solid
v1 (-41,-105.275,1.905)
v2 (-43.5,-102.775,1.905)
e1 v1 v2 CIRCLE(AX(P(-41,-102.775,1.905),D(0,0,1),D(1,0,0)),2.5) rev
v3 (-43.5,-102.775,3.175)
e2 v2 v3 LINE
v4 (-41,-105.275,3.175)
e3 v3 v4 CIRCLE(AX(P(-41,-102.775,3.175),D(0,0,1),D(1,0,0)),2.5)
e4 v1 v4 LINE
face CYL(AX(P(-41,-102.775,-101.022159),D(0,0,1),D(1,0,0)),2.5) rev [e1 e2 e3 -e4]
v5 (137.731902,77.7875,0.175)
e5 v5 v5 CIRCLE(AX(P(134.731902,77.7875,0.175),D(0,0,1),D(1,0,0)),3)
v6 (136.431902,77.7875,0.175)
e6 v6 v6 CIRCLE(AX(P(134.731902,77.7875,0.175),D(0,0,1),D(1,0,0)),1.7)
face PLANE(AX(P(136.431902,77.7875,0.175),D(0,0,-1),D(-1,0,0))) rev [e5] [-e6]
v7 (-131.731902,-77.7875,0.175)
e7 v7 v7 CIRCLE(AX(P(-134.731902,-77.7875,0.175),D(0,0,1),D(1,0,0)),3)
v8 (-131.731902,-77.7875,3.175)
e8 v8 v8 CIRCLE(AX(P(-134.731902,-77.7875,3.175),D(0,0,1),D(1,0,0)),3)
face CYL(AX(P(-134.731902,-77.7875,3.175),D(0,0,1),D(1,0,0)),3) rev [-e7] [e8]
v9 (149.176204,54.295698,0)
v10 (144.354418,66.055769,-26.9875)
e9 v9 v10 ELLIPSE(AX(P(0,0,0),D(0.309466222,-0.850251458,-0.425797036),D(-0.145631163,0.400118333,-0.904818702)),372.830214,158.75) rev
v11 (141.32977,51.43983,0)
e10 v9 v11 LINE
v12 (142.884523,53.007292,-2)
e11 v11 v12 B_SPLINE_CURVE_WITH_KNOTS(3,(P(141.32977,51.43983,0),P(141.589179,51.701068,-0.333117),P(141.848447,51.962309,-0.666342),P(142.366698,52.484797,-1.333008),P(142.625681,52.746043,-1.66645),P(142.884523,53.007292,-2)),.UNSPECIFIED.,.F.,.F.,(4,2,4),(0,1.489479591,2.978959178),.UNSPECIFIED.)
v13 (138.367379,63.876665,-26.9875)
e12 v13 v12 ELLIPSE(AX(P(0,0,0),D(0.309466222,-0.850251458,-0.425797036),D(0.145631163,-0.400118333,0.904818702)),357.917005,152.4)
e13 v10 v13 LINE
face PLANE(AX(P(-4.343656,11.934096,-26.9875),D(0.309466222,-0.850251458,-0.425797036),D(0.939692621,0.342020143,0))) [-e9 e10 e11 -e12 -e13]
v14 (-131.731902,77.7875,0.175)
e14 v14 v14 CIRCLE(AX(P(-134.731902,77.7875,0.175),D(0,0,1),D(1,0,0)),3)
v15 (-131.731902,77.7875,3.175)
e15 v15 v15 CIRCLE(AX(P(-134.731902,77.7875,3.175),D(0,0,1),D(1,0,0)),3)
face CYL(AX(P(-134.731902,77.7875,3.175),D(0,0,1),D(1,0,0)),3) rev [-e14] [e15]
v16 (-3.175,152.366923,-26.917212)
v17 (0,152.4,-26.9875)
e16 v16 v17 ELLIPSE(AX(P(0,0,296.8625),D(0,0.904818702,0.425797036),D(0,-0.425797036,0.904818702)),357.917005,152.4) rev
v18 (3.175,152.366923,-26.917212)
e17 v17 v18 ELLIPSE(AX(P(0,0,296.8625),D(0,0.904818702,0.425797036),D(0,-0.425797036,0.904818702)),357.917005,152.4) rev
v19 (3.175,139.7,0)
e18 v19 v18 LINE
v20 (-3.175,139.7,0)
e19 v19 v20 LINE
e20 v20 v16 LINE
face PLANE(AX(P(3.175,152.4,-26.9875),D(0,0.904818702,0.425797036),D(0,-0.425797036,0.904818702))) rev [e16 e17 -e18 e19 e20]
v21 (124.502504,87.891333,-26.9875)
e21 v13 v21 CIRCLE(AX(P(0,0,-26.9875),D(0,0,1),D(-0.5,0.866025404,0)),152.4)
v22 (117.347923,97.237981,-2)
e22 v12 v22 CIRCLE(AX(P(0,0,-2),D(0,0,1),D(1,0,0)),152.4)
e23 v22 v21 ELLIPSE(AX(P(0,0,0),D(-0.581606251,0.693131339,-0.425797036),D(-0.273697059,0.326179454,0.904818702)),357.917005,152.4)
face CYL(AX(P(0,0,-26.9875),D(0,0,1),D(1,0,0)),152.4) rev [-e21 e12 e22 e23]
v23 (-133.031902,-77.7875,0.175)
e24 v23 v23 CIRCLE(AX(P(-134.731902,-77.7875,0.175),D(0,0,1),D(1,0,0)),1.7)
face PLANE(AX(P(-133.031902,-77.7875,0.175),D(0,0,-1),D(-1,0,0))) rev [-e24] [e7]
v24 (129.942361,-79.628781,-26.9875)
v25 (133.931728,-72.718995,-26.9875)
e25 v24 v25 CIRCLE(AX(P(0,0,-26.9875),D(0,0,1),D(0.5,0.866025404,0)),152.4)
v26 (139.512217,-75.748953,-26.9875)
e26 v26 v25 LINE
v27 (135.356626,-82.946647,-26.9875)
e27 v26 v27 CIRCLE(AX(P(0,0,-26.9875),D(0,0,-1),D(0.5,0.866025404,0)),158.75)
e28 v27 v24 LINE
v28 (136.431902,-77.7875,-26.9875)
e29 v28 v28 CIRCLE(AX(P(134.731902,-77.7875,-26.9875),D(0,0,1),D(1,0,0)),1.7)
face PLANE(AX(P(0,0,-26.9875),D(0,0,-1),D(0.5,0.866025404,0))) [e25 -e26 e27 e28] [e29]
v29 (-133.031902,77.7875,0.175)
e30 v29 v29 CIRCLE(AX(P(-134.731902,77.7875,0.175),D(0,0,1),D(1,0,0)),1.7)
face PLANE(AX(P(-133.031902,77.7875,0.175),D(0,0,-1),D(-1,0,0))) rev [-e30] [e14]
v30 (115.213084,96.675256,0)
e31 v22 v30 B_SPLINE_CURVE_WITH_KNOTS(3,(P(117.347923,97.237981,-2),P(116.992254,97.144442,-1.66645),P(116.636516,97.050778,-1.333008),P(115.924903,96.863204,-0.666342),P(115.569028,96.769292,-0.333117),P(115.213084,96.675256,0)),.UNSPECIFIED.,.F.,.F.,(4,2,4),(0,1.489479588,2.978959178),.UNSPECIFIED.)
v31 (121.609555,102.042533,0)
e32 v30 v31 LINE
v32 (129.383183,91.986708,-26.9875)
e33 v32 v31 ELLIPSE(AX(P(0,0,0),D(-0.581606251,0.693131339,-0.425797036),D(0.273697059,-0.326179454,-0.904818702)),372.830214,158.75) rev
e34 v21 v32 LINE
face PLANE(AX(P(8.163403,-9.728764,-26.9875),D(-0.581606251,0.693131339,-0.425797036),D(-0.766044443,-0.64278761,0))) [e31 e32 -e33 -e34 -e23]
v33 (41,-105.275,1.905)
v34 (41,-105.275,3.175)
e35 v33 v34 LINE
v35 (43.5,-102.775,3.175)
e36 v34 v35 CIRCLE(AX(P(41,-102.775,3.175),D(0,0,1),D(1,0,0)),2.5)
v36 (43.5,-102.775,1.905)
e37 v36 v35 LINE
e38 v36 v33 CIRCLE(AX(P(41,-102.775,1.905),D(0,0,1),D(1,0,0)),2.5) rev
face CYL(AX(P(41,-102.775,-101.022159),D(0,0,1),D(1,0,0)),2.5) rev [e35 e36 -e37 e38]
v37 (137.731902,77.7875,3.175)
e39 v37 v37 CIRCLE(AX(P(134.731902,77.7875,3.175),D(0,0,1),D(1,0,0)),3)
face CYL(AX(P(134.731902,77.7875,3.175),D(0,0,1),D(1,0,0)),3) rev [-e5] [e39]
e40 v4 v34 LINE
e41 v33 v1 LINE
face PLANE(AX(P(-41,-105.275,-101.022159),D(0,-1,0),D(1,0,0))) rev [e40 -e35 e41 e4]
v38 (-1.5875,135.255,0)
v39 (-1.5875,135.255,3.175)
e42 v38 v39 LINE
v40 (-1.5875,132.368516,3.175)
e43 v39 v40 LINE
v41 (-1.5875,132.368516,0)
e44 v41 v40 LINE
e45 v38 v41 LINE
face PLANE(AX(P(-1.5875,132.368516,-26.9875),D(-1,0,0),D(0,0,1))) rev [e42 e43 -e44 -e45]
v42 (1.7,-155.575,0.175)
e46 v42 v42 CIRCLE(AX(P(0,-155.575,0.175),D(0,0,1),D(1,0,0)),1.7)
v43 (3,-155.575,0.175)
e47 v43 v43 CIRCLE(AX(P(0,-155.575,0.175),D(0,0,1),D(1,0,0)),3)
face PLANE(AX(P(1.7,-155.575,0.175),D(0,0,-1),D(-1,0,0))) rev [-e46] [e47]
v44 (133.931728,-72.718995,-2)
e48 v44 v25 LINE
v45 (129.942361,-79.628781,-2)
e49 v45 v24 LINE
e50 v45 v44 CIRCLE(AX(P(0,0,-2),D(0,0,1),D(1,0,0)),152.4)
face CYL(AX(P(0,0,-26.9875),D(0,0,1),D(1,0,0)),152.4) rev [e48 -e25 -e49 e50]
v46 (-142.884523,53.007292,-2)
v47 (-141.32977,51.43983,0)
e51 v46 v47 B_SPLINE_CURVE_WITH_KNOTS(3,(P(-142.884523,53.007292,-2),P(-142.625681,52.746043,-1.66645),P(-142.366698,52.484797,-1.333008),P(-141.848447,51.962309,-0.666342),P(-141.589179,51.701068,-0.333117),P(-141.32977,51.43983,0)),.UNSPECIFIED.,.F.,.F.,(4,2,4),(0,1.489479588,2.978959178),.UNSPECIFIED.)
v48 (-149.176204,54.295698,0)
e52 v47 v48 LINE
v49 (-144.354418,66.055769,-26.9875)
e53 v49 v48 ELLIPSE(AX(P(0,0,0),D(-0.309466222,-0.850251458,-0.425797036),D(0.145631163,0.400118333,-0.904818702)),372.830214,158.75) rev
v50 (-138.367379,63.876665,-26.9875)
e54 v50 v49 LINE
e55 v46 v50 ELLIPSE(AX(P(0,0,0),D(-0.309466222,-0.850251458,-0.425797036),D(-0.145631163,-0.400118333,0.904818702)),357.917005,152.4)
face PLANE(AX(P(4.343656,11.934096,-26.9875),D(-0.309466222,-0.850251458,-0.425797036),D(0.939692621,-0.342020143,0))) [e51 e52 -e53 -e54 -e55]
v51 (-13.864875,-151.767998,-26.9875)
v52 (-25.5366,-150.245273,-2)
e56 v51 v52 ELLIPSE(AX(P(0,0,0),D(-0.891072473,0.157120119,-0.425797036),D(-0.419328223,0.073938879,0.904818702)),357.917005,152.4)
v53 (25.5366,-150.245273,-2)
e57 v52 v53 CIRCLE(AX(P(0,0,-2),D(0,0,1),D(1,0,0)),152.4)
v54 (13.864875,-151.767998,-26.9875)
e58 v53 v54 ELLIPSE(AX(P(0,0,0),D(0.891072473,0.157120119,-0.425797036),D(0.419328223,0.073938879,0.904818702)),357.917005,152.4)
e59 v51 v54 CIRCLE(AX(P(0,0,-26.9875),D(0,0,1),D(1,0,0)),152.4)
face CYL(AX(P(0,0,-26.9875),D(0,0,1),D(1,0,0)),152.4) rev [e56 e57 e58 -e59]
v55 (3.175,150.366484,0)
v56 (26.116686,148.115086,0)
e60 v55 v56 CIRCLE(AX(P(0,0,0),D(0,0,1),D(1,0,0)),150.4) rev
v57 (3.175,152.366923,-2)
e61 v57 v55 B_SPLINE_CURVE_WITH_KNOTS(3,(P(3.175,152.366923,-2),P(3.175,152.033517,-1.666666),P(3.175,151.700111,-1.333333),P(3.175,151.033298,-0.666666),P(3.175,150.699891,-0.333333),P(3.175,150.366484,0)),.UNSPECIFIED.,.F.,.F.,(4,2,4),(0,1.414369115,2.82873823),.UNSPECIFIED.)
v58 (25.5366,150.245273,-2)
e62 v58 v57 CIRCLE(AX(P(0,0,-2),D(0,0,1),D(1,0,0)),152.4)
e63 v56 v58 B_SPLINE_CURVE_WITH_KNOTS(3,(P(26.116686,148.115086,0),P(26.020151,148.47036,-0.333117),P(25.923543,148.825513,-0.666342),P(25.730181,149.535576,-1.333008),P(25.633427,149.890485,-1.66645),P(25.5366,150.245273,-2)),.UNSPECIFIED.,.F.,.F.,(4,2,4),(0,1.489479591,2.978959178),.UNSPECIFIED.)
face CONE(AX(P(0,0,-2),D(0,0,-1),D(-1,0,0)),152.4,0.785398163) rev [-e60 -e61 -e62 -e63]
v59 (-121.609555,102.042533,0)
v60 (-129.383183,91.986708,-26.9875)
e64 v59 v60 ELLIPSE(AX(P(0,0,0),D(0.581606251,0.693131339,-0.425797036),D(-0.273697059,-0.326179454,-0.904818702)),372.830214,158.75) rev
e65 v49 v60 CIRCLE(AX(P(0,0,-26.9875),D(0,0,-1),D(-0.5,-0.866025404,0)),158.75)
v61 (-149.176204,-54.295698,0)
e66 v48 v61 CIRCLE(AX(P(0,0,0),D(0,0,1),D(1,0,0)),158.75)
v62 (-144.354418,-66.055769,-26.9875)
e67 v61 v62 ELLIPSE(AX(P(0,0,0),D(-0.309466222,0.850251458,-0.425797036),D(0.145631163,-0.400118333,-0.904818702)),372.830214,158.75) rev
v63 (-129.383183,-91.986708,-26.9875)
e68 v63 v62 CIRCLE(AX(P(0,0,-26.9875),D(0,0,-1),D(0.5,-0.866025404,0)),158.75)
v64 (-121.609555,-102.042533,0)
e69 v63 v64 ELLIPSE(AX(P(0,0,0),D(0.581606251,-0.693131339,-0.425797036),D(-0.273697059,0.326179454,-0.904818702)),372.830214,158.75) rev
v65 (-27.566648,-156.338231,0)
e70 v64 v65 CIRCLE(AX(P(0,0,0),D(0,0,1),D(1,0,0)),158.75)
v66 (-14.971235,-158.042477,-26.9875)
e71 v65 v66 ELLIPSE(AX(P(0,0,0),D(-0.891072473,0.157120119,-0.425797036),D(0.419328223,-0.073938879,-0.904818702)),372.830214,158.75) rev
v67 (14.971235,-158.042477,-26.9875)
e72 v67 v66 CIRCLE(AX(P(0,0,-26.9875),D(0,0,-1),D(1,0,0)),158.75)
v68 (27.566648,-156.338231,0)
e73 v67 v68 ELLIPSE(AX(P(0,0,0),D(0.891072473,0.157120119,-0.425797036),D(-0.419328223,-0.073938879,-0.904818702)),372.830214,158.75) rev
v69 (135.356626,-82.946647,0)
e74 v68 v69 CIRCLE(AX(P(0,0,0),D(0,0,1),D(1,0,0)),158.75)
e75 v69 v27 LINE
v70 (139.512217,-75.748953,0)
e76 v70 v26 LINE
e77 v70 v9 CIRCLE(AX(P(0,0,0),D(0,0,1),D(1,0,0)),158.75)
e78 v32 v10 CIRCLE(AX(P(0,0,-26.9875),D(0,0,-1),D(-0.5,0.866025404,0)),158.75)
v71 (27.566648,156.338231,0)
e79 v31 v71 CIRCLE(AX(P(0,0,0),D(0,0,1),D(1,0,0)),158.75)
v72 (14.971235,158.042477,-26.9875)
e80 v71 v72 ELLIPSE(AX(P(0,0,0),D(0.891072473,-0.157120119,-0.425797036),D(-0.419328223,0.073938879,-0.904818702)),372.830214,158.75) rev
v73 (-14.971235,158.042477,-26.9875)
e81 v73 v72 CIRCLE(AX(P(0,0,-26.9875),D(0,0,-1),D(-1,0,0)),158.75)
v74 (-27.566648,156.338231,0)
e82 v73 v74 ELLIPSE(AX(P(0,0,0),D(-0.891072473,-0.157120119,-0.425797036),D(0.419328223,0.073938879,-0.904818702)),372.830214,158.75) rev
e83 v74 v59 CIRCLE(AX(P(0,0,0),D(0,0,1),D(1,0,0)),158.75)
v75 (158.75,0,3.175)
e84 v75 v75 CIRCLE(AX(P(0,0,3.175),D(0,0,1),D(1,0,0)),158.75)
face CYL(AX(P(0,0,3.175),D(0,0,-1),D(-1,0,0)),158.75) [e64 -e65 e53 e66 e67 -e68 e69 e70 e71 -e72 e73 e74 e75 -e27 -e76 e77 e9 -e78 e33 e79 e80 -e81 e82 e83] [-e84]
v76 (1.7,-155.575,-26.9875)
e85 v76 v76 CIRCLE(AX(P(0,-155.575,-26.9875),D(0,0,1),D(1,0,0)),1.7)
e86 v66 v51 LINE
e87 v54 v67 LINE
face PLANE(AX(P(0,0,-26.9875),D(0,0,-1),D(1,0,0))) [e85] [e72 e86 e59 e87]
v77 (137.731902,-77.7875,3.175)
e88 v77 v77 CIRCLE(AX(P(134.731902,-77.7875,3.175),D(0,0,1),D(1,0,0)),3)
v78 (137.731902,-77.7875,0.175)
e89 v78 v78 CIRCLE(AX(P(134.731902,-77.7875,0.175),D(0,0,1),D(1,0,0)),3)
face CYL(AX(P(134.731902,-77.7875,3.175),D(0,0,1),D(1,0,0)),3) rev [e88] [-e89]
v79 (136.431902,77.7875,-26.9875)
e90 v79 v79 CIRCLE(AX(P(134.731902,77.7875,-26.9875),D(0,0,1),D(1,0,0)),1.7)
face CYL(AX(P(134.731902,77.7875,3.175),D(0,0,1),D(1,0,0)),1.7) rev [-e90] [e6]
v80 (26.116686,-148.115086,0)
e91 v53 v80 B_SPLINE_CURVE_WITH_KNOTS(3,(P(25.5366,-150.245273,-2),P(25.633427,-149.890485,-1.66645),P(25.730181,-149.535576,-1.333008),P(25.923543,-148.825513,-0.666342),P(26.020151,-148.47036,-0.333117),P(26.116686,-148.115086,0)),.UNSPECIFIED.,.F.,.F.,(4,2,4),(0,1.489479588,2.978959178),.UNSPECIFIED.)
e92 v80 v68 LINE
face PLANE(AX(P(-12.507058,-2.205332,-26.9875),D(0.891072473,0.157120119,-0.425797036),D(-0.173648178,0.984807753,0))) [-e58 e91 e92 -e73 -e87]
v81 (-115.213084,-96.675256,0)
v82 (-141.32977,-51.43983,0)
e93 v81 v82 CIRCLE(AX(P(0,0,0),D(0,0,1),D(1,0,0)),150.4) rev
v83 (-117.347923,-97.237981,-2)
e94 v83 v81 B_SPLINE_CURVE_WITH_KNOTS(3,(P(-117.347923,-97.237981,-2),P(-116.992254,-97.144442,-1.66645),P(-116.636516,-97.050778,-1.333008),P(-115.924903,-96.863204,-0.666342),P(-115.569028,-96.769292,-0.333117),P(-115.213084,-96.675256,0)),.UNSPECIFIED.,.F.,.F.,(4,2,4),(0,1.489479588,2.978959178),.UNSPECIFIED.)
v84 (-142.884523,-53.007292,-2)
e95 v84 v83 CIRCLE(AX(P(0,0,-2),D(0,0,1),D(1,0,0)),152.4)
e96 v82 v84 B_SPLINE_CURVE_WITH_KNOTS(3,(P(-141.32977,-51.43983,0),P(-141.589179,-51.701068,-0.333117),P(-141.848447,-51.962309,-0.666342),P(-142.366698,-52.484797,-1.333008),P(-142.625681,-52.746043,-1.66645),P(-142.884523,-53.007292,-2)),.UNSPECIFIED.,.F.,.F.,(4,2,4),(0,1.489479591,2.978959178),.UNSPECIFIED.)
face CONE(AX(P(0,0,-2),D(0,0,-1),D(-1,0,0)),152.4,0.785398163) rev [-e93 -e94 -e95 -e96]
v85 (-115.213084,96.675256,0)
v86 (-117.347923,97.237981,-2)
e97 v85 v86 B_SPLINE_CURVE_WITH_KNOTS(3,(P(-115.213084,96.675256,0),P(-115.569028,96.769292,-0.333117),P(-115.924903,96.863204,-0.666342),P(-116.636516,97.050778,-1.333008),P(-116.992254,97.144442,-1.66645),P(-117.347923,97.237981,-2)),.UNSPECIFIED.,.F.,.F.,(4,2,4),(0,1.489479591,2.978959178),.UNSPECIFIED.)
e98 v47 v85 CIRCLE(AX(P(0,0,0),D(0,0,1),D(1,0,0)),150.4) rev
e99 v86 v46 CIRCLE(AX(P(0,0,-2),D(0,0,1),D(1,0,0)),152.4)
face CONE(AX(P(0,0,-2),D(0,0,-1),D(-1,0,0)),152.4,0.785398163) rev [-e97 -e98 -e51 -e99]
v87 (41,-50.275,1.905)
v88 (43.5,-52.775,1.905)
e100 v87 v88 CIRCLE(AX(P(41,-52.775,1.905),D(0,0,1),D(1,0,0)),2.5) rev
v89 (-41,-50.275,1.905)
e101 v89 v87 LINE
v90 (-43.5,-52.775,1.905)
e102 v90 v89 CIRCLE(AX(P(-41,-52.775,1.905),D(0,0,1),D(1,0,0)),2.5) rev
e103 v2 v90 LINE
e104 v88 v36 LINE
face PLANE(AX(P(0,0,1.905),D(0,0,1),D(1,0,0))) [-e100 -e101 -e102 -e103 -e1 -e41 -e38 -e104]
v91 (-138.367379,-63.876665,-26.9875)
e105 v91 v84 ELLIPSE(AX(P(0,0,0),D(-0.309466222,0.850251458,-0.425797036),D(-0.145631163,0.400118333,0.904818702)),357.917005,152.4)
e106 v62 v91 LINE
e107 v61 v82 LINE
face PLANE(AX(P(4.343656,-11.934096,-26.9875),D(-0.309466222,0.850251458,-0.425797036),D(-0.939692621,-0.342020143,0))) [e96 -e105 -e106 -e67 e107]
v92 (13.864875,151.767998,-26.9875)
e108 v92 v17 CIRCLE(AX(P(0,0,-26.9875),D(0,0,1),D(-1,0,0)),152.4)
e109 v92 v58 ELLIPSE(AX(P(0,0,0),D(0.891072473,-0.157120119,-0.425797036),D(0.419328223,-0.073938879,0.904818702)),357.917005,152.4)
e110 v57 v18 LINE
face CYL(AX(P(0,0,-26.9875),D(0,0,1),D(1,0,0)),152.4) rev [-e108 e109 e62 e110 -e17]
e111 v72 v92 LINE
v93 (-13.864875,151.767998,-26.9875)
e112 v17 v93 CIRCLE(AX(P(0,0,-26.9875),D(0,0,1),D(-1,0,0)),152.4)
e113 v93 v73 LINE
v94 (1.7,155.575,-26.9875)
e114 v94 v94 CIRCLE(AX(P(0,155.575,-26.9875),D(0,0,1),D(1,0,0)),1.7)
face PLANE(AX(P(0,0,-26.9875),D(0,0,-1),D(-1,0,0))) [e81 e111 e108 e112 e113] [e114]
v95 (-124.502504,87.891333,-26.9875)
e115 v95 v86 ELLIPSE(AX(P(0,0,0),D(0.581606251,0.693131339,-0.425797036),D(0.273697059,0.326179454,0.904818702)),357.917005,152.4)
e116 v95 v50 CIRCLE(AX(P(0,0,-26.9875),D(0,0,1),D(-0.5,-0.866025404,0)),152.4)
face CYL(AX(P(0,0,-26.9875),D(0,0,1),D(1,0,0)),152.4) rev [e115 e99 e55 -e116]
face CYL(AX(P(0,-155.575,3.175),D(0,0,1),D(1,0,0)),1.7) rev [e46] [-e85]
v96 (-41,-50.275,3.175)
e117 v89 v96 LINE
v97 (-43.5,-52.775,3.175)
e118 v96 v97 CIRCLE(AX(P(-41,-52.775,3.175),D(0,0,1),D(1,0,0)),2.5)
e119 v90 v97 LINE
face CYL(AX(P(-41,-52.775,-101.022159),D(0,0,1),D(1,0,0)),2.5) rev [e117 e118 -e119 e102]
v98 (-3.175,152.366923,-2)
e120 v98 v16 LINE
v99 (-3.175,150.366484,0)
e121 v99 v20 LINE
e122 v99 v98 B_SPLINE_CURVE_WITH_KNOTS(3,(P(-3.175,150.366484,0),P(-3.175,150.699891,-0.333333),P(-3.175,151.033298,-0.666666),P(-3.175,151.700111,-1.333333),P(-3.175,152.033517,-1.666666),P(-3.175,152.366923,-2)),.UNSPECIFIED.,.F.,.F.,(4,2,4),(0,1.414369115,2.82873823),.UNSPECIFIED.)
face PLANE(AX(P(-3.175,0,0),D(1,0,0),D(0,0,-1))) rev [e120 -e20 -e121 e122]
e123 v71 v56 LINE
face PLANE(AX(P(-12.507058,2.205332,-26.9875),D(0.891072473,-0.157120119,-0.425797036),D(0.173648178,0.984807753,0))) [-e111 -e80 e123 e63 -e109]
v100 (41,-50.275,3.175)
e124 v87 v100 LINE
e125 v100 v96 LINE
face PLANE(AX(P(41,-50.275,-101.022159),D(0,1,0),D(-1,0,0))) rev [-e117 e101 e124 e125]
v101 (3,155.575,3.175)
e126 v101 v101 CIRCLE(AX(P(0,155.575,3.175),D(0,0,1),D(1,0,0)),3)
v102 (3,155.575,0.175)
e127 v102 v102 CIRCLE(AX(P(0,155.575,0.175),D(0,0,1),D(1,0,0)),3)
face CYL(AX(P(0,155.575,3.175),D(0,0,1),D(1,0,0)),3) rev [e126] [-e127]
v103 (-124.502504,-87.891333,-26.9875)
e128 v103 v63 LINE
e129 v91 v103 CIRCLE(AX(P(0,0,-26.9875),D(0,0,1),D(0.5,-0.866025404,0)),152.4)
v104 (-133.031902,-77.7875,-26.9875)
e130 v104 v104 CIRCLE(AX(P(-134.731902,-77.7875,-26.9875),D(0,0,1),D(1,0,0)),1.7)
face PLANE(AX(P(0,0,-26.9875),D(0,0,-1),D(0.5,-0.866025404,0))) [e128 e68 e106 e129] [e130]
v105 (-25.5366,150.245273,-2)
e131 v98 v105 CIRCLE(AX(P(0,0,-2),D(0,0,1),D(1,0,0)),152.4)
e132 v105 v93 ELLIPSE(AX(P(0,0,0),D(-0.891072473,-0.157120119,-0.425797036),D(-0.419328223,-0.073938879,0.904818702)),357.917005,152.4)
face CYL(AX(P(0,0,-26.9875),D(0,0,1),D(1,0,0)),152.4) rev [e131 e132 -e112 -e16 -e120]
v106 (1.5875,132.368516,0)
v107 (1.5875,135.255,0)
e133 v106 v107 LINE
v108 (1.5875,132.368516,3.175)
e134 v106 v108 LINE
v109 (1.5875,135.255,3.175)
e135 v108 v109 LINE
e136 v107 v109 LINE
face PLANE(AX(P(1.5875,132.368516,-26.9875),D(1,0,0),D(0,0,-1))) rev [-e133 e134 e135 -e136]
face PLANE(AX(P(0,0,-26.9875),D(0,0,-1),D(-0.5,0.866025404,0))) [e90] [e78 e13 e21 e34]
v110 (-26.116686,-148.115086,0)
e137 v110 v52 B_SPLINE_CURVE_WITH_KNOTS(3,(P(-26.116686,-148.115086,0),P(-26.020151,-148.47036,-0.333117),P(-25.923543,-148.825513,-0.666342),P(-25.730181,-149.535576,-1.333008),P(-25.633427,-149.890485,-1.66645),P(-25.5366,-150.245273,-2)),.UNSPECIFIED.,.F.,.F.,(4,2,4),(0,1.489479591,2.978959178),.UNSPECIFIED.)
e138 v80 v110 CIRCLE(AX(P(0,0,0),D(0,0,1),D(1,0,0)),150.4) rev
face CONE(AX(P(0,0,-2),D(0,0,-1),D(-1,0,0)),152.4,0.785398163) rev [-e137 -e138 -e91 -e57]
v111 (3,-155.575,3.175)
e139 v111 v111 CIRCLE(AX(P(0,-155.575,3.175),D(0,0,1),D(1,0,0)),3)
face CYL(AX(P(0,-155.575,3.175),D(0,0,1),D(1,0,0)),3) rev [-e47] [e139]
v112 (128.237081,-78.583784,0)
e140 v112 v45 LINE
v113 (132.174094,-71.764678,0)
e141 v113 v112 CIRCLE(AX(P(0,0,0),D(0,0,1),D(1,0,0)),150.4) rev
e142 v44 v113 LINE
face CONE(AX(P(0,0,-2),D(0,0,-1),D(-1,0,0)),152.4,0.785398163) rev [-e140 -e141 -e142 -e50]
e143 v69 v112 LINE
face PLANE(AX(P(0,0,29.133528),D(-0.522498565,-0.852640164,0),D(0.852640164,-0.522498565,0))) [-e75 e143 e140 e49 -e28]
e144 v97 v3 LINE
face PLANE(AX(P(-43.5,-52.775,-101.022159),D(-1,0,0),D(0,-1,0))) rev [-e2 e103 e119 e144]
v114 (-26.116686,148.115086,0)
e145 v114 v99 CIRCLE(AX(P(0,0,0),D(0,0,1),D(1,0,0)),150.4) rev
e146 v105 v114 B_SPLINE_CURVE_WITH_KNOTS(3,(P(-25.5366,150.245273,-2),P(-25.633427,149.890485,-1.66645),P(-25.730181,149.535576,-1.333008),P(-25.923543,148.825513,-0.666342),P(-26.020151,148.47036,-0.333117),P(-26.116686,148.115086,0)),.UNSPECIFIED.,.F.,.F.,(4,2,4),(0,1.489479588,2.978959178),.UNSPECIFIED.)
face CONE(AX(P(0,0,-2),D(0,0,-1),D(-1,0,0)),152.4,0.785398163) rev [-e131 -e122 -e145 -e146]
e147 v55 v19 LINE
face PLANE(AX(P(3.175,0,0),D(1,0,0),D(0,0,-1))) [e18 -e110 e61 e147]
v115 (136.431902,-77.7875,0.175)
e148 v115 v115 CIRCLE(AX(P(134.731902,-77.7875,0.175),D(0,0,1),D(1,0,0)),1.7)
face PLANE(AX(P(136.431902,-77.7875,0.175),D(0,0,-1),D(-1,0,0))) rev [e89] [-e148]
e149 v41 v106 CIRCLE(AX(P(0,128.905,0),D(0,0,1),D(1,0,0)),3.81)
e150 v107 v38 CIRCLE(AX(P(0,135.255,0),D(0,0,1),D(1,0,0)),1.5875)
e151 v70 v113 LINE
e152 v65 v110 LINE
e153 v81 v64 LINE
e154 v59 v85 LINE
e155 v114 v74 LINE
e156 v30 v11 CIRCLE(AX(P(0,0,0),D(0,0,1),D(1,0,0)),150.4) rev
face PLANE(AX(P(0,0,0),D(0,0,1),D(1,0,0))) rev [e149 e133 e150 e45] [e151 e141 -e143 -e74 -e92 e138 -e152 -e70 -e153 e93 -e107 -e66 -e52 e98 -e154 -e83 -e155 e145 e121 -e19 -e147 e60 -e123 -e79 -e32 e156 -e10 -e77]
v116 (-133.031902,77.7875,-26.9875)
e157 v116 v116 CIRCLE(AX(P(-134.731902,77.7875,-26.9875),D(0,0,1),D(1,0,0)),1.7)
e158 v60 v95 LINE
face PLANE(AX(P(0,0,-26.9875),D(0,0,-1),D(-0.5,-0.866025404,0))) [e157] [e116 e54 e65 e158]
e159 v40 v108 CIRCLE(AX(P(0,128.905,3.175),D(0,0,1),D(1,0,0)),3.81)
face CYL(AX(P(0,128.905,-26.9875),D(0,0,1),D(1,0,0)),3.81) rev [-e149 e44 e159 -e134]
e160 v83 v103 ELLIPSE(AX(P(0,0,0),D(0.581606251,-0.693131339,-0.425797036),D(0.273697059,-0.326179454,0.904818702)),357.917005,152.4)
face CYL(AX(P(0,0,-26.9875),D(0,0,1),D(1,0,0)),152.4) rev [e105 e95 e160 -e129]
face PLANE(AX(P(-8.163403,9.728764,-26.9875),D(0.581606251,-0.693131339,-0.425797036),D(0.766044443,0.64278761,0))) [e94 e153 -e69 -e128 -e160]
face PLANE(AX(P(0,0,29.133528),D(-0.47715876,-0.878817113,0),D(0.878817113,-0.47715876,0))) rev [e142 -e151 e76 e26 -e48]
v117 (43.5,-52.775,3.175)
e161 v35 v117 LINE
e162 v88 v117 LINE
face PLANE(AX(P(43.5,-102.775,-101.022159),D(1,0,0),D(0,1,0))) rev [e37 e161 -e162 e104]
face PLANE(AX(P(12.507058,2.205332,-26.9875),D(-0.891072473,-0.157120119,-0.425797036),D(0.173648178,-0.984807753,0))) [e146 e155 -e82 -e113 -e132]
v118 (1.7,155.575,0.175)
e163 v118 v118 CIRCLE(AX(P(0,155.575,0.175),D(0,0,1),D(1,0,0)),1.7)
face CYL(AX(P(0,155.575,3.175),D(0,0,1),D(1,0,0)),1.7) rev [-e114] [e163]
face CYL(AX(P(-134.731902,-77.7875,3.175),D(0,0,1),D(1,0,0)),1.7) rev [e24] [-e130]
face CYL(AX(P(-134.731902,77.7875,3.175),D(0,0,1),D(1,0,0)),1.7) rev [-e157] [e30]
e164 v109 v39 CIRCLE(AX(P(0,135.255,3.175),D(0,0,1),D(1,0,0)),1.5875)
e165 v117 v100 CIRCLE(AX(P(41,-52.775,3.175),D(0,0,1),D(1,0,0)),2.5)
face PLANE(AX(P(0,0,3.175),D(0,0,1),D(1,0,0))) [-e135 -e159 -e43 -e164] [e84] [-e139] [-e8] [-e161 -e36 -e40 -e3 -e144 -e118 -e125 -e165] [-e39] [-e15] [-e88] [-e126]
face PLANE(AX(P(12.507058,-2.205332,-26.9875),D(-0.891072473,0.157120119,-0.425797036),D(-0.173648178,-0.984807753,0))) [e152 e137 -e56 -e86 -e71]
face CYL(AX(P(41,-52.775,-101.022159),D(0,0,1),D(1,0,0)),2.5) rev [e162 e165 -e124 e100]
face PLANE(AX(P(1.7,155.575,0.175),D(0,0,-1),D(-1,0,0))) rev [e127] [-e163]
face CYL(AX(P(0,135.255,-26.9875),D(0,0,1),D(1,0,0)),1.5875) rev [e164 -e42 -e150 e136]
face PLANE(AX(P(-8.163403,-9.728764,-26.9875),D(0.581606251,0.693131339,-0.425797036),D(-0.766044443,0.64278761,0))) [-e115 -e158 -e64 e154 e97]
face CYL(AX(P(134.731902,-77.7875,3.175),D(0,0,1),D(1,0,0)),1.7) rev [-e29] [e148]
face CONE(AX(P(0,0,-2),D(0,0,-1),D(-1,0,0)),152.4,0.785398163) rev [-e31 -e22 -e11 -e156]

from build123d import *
from OCP.BRepFilletAPI import BRepFilletAPI_MakeChamfer
from build123d.topology import SkipClean

# Parameters (mm, degrees)
SKETCH1_R                      = 158.75
BOSS_EXTRUDE1_DEPTH            = 3.175
BOSS_EXTRUDE2_START            = 26.9875
BOSS_EXTRUDE2_DEPTH            = 26.9875
CHAMFER1_SIZE                  = 26.9875
CHAMFER1_SIZE_2                = 12.7
CBORE_FOR_M3_SHCS1_D           = 3.4
CBORE_FOR_M3_SHCS1_CBORE_D     = 6
CBORE_FOR_M3_SHCS1_CBORE_DEPTH = 3
CIRPATTERN1_COUNT              = 6
CHAMFER1_OF_CIRPATTERN1_SIZE   = 26.9875
CHAMFER1_OF_CIRPATTERN1_SIZE_2 = 12.7
CUT_EXTRUDE1_DEPTH             = 3.175
SKETCH8_W                      = 86
SKETCH8_H                      = 54
CUT_EXTRUDE2_DEPTH             = 1.27
FILLET1_R                      = 2
CUT_EXTRUDE4_DEPTH             = 1.27
CUT_EXTRUDE3_DEPTH             = 26.9875
BOSS_EXTRUDE3_DEPTH            = 3.175
CHAMFER2_SIZE                  = 2


with BuildPart() as part:
    # Sketch1 → Boss-Extrude1 (new body)
    with BuildSketch(Plane.XY):
        Circle(SKETCH1_R)
    extrude(amount=BOSS_EXTRUDE1_DEPTH)

    # Sketch9 → Boss-Extrude2 (add)
    with SkipClean():  # the faces are left unmerged after this step: merging them gives an invalid solid
        with BuildSketch(Plane(origin=(0, 0, 0), x_dir=(-1, 0, 0), z_dir=(0, 0, -1)).offset(BOSS_EXTRUDE2_START)):
            with BuildLine():
                Line((-27.566648205, 156.338230791), (-26.463982276, 150.084701559))
                ThreePointArc((-26.463982276, 150.084701559), (0, 152.4), (26.463982276, 150.084701559))
                Line((26.463982276, 150.084701559), (27.566648205, 156.338230791))
                ThreePointArc((27.566648205, 156.338230791), (0, 158.75), (-27.566648205, 156.338230791))
            make_face()
        boss_extrude2 = extrude(amount=-BOSS_EXTRUDE2_DEPTH)

    # Chamfer1
    chamfer1_edges_1 = [part.edges().sort_by_distance(p)[0] for p in [
        (27.015315241, 153.211466175, -26.9875),
    ]]
    chamfer1_side_1 = [part.faces().sort_by_distance(p)[0] for p in [
        (27.015315241, 153.211466175, -26.7335),
    ]]
    chamfer1_edges_2 = [part.edges().sort_by_distance(p)[0] for p in [
        (-27.015315241, 153.211466175, -26.9875),
    ]]
    chamfer1_side_2 = [part.faces().sort_by_distance(p)[0] for p in [
        (-27.015315241, 153.211466175, -26.7335),
    ]]
    chamfer1 = BRepFilletAPI_MakeChamfer(part.part.solid().wrapped)
    for e in chamfer1_edges_1:
        chamfer1.Add(CHAMFER1_SIZE - 0.0001, CHAMFER1_SIZE_2 - 0.0001, e.wrapped, chamfer1_side_1[0].wrapped)
    for e in chamfer1_edges_2:
        chamfer1.Add(CHAMFER1_SIZE - 0.0001, CHAMFER1_SIZE_2 - 0.0001, e.wrapped, chamfer1_side_2[0].wrapped)
    add(Compound.cast(chamfer1.Shape()), mode=Mode.REPLACE)  # a hair under: the kernel refuses the full size

    # CBORE for M3 SHCS1 (through all)
    with Locations(Plane.XY.offset(3.175)):
        with Locations((0, 155.575)):
            cbore_for_m3_shcs1 = CounterBoreHole(CBORE_FOR_M3_SHCS1_D / 2, CBORE_FOR_M3_SHCS1_CBORE_D / 2, CBORE_FOR_M3_SHCS1_CBORE_DEPTH)

    # CirPattern1: Boss-Extrude2, CBORE for M3 SHCS1 ×6 about axis
    cirpattern1_axis = Axis((0, 0, 0), (0, 0, 1))
    add([boss_extrude2.rotate(cirpattern1_axis, i * 360 / CIRPATTERN1_COUNT) for i in range(1, CIRPATTERN1_COUNT)])
    add([cbore_for_m3_shcs1.rotate(cirpattern1_axis, i * 360 / CIRPATTERN1_COUNT) for i in range(1, CIRPATTERN1_COUNT)], mode=Mode.SUBTRACT)

    # Chamfer1 of CirPattern1
    chamfer1_of_cirpattern1_edges_1 = [part.edges().sort_by_distance(p)[0] for p in [
        (-119.177364238, 100.001682377, -26.9875),
    ]]
    chamfer1_of_cirpattern1_side_1 = [part.faces().sort_by_distance(p)[0] for p in [
        (-119.177364238, 100.001682377, -26.7335),
    ]]
    chamfer1_of_cirpattern1_edges_2 = [part.edges().sort_by_distance(p)[0] for p in [
        (-146.192679479, 53.209783798, -26.9875),
    ]]
    chamfer1_of_cirpattern1_side_2 = [part.faces().sort_by_distance(p)[0] for p in [
        (-146.192679479, 53.209783798, -26.7335),
    ]]
    chamfer1_of_cirpattern1_edges_3 = [part.edges().sort_by_distance(p)[0] for p in [
        (-146.192679479, -53.209783798, -26.9875),
    ]]
    chamfer1_of_cirpattern1_side_3 = [part.faces().sort_by_distance(p)[0] for p in [
        (-146.192679479, -53.209783798, -26.7335),
    ]]
    chamfer1_of_cirpattern1_edges_4 = [part.edges().sort_by_distance(p)[0] for p in [
        (-119.177364238, -100.001682377, -26.9875),
    ]]
    chamfer1_of_cirpattern1_side_4 = [part.faces().sort_by_distance(p)[0] for p in [
        (-119.177364238, -100.001682377, -26.7335),
    ]]
    chamfer1_of_cirpattern1_edges_5 = [part.edges().sort_by_distance(p)[0] for p in [
        (-27.015315241, -153.211466175, -26.9875),
    ]]
    chamfer1_of_cirpattern1_side_5 = [part.faces().sort_by_distance(p)[0] for p in [
        (-27.015315241, -153.211466175, -26.7335),
    ]]
    chamfer1_of_cirpattern1_edges_6 = [part.edges().sort_by_distance(p)[0] for p in [
        (27.015315241, -153.211466175, -26.9875),
    ]]
    chamfer1_of_cirpattern1_side_6 = [part.faces().sort_by_distance(p)[0] for p in [
        (27.015315241, -153.211466175, -26.7335),
    ]]
    chamfer1_of_cirpattern1_edges_7 = [part.edges().sort_by_distance(p)[0] for p in [
        (119.177364238, -100.001682377, -26.9875),
    ]]
    chamfer1_of_cirpattern1_side_7 = [part.faces().sort_by_distance(p)[0] for p in [
        (119.177364238, -100.001682377, -26.7335),
    ]]
    chamfer1_of_cirpattern1_edges_8 = [part.edges().sort_by_distance(p)[0] for p in [
        (146.192679479, -53.209783798, -26.9875),
    ]]
    chamfer1_of_cirpattern1_side_8 = [part.faces().sort_by_distance(p)[0] for p in [
        (146.105806362, -53.448465724, -26.9875),
    ]]
    chamfer1_of_cirpattern1_edges_9 = [part.edges().sort_by_distance(p)[0] for p in [
        (146.192679479, 53.209783798, -26.9875),
    ]]
    chamfer1_of_cirpattern1_side_9 = [part.faces().sort_by_distance(p)[0] for p in [
        (146.192679479, 53.209783798, -26.7335),
    ]]
    chamfer1_of_cirpattern1_edges_10 = [part.edges().sort_by_distance(p)[0] for p in [
        (119.177364238, 100.001682377, -26.9875),
    ]]
    chamfer1_of_cirpattern1_side_10 = [part.faces().sort_by_distance(p)[0] for p in [
        (119.177364238, 100.001682377, -26.7335),
    ]]
    chamfer1_of_cirpattern1 = BRepFilletAPI_MakeChamfer(part.part.solid().wrapped)
    for e in chamfer1_of_cirpattern1_edges_1:
        chamfer1_of_cirpattern1.Add(CHAMFER1_OF_CIRPATTERN1_SIZE - 0.0001, CHAMFER1_OF_CIRPATTERN1_SIZE_2 - 0.0001, e.wrapped, chamfer1_of_cirpattern1_side_1[0].wrapped)
    for e in chamfer1_of_cirpattern1_edges_2:
        chamfer1_of_cirpattern1.Add(CHAMFER1_OF_CIRPATTERN1_SIZE - 0.0001, CHAMFER1_OF_CIRPATTERN1_SIZE_2 - 0.0001, e.wrapped, chamfer1_of_cirpattern1_side_2[0].wrapped)
    for e in chamfer1_of_cirpattern1_edges_3:
        chamfer1_of_cirpattern1.Add(CHAMFER1_OF_CIRPATTERN1_SIZE - 0.0001, CHAMFER1_OF_CIRPATTERN1_SIZE_2 - 0.0001, e.wrapped, chamfer1_of_cirpattern1_side_3[0].wrapped)
    for e in chamfer1_of_cirpattern1_edges_4:
        chamfer1_of_cirpattern1.Add(CHAMFER1_OF_CIRPATTERN1_SIZE - 0.0001, CHAMFER1_OF_CIRPATTERN1_SIZE_2 - 0.0001, e.wrapped, chamfer1_of_cirpattern1_side_4[0].wrapped)
    for e in chamfer1_of_cirpattern1_edges_5:
        chamfer1_of_cirpattern1.Add(CHAMFER1_OF_CIRPATTERN1_SIZE - 0.0001, CHAMFER1_OF_CIRPATTERN1_SIZE_2 - 0.0001, e.wrapped, chamfer1_of_cirpattern1_side_5[0].wrapped)
    for e in chamfer1_of_cirpattern1_edges_6:
        chamfer1_of_cirpattern1.Add(CHAMFER1_OF_CIRPATTERN1_SIZE - 0.0001, CHAMFER1_OF_CIRPATTERN1_SIZE_2 - 0.0001, e.wrapped, chamfer1_of_cirpattern1_side_6[0].wrapped)
    for e in chamfer1_of_cirpattern1_edges_7:
        chamfer1_of_cirpattern1.Add(CHAMFER1_OF_CIRPATTERN1_SIZE - 0.0001, CHAMFER1_OF_CIRPATTERN1_SIZE_2 - 0.0001, e.wrapped, chamfer1_of_cirpattern1_side_7[0].wrapped)
    for e in chamfer1_of_cirpattern1_edges_8:
        chamfer1_of_cirpattern1.Add(CHAMFER1_OF_CIRPATTERN1_SIZE_2 - 0.0001, CHAMFER1_OF_CIRPATTERN1_SIZE - 0.0001, e.wrapped, chamfer1_of_cirpattern1_side_8[0].wrapped)
    for e in chamfer1_of_cirpattern1_edges_9:
        chamfer1_of_cirpattern1.Add(CHAMFER1_OF_CIRPATTERN1_SIZE - 0.0001, CHAMFER1_OF_CIRPATTERN1_SIZE_2 - 0.0001, e.wrapped, chamfer1_of_cirpattern1_side_9[0].wrapped)
    for e in chamfer1_of_cirpattern1_edges_10:
        chamfer1_of_cirpattern1.Add(CHAMFER1_OF_CIRPATTERN1_SIZE - 0.0001, CHAMFER1_OF_CIRPATTERN1_SIZE_2 - 0.0001, e.wrapped, chamfer1_of_cirpattern1_side_10[0].wrapped)
    add(Compound.cast(chamfer1_of_cirpattern1.Shape()), mode=Mode.REPLACE)  # a hair under: the kernel refuses the full size

    # Sketch7 → Cut-Extrude1 (cut)
    with BuildSketch(Plane.XY.offset(3.175)):
        with BuildLine():
            Line((-1.5875, 132.368516096), (-1.5875, 135.255))
            ThreePointArc((-1.5875, 135.255), (0, 136.8425), (1.5875, 135.255))
            Line((1.5875, 135.255), (1.5875, 132.368516096))
            ThreePointArc((1.5875, 132.368516096), (0, 125.095), (-1.5875, 132.368516096))
        make_face()
    extrude(amount=-CUT_EXTRUDE1_DEPTH, mode=Mode.SUBTRACT)

    # Sketch8 → Cut-Extrude2 (cut)
    with BuildSketch(Plane.XY.offset(3.175)):
        with Locations((0, -77.775)):
            Rectangle(SKETCH8_W, SKETCH8_H)
    extrude(amount=-CUT_EXTRUDE2_DEPTH, mode=Mode.SUBTRACT)

    # Fillet1
    fillet1_edges = [part.edges().sort_by_distance(p)[0] for p in [
        (-43, -104.775, 2.54),
        (-43, -50.775, 2.54),
        (43, -50.775, 2.54),
        (43, -104.775, 2.54),
    ]]
    fillet(fillet1_edges, radius=FILLET1_R)

    # Sketch13 → Cut-Extrude4 (cut)
    with BuildSketch(Plane.XY.offset(3.175)):
        with BuildLine():
            Line((-43.5, -52.775), (-43.5, -102.775))
            ThreePointArc((-43.5, -102.775), (-42.767766953, -104.542766953), (-41, -105.275))
            Line((-41, -105.275), (41, -105.275))
            ThreePointArc((41, -105.275), (42.767766953, -104.542766953), (43.5, -102.775))
            Line((43.5, -102.775), (43.5, -52.775))
            ThreePointArc((43.5, -52.775), (42.767766953, -51.007233047), (41, -50.275))
            Line((41, -50.275), (-41, -50.275))
            ThreePointArc((-41, -50.275), (-42.767766953, -51.007233047), (-43.5, -52.775))
        make_face()
    extrude(amount=-CUT_EXTRUDE4_DEPTH, mode=Mode.SUBTRACT)

    # Sketch10 → Cut-Extrude3 (cut)
    with BuildSketch(Plane(origin=(0, 0, -26.9875), x_dir=(-1, 0, 0), z_dir=(0, 0, -1))):
        with BuildLine():
            ThreePointArc((-144.354417642, -66.055768917), (-142.016041239, -70.943685629), (-139.512216635, -75.748953191))
            Line((-139.512216635, -75.748953191), (-133.93172797, -72.718995064))
            ThreePointArc((-133.93172797, -72.718995064), (-136.221318638, -68.333830192), (-138.367379277, -63.876665161))
            Line((-138.367379277, -63.876665161), (-144.354417642, -66.055768917))
        make_face()
        with BuildLine():
            Line((-129.942361048, -79.628781263), (-135.356626091, -82.946647149))
            ThreePointArc((-135.356626091, -82.946647149), (-132.447054613, -87.517656643), (-129.38318277, -91.986708368))
            Line((-129.38318277, -91.986708368), (-124.502504377, -87.891332929))
            ThreePointArc((-124.502504377, -87.891332929), (-127.289492203, -83.804207381), (-129.942361048, -79.628781263))
        make_face()
        with BuildLine():
            ThreePointArc((-149.17620355, -54.295697753), (-146.883052844, -60.224009226), (-144.354417642, -66.055768917))
            Line((-144.354417642, -66.055768917), (-138.367379277, -63.876665161))
            ThreePointArc((-138.367379277, -63.876665161), (-140.910852211, -58.05076855), (-143.209155408, -52.123869843))
            Line((-143.209155408, -52.123869843), (-149.17620355, -54.295697753))
        make_face()
        with BuildLine():
            Line((-124.502504377, -87.891332929), (-129.38318277, -91.986708368))
            ThreePointArc((-129.38318277, -91.986708368), (-125.597048329, -97.092450535), (-121.609555345, -102.042533038))
            Line((-121.609555345, -102.042533038), (-116.745173131, -97.960831716))
            ThreePointArc((-116.745173131, -97.960831716), (-120.728866379, -93.006993408), (-124.502504377, -87.891332929))
        make_face()
    extrude(amount=-CUT_EXTRUDE3_DEPTH, mode=Mode.SUBTRACT)

    # Sketch11 → Boss-Extrude3 (add, symmetric)
    with BuildSketch(Plane(origin=(0, 0, 0), x_dir=(0, 0, -1), z_dir=(1, 0, 0))):
        Polygon((26.9875, 152.4), (0, 152.4), (0, 139.7), align=None)
    extrude(amount=BOSS_EXTRUDE3_DEPTH, both=True)

    # Chamfer2
    chamfer2_edges = [part.edges().sort_by_distance(p)[0] for p in [
        (131.982271537, -76.2, 0),
        (0, -152.4, 0),
        (-131.982271537, -76.2, 0),
        (-131.982271537, 76.2, 0),
        (-14.863359372, 151.673466856, 0),
        (14.863359372, 151.673466856, 0),
        (131.982271537, 76.2, 0),
    ]]
    chamfer(chamfer2_edges, length=CHAMFER2_SIZE)


solid = part.part
